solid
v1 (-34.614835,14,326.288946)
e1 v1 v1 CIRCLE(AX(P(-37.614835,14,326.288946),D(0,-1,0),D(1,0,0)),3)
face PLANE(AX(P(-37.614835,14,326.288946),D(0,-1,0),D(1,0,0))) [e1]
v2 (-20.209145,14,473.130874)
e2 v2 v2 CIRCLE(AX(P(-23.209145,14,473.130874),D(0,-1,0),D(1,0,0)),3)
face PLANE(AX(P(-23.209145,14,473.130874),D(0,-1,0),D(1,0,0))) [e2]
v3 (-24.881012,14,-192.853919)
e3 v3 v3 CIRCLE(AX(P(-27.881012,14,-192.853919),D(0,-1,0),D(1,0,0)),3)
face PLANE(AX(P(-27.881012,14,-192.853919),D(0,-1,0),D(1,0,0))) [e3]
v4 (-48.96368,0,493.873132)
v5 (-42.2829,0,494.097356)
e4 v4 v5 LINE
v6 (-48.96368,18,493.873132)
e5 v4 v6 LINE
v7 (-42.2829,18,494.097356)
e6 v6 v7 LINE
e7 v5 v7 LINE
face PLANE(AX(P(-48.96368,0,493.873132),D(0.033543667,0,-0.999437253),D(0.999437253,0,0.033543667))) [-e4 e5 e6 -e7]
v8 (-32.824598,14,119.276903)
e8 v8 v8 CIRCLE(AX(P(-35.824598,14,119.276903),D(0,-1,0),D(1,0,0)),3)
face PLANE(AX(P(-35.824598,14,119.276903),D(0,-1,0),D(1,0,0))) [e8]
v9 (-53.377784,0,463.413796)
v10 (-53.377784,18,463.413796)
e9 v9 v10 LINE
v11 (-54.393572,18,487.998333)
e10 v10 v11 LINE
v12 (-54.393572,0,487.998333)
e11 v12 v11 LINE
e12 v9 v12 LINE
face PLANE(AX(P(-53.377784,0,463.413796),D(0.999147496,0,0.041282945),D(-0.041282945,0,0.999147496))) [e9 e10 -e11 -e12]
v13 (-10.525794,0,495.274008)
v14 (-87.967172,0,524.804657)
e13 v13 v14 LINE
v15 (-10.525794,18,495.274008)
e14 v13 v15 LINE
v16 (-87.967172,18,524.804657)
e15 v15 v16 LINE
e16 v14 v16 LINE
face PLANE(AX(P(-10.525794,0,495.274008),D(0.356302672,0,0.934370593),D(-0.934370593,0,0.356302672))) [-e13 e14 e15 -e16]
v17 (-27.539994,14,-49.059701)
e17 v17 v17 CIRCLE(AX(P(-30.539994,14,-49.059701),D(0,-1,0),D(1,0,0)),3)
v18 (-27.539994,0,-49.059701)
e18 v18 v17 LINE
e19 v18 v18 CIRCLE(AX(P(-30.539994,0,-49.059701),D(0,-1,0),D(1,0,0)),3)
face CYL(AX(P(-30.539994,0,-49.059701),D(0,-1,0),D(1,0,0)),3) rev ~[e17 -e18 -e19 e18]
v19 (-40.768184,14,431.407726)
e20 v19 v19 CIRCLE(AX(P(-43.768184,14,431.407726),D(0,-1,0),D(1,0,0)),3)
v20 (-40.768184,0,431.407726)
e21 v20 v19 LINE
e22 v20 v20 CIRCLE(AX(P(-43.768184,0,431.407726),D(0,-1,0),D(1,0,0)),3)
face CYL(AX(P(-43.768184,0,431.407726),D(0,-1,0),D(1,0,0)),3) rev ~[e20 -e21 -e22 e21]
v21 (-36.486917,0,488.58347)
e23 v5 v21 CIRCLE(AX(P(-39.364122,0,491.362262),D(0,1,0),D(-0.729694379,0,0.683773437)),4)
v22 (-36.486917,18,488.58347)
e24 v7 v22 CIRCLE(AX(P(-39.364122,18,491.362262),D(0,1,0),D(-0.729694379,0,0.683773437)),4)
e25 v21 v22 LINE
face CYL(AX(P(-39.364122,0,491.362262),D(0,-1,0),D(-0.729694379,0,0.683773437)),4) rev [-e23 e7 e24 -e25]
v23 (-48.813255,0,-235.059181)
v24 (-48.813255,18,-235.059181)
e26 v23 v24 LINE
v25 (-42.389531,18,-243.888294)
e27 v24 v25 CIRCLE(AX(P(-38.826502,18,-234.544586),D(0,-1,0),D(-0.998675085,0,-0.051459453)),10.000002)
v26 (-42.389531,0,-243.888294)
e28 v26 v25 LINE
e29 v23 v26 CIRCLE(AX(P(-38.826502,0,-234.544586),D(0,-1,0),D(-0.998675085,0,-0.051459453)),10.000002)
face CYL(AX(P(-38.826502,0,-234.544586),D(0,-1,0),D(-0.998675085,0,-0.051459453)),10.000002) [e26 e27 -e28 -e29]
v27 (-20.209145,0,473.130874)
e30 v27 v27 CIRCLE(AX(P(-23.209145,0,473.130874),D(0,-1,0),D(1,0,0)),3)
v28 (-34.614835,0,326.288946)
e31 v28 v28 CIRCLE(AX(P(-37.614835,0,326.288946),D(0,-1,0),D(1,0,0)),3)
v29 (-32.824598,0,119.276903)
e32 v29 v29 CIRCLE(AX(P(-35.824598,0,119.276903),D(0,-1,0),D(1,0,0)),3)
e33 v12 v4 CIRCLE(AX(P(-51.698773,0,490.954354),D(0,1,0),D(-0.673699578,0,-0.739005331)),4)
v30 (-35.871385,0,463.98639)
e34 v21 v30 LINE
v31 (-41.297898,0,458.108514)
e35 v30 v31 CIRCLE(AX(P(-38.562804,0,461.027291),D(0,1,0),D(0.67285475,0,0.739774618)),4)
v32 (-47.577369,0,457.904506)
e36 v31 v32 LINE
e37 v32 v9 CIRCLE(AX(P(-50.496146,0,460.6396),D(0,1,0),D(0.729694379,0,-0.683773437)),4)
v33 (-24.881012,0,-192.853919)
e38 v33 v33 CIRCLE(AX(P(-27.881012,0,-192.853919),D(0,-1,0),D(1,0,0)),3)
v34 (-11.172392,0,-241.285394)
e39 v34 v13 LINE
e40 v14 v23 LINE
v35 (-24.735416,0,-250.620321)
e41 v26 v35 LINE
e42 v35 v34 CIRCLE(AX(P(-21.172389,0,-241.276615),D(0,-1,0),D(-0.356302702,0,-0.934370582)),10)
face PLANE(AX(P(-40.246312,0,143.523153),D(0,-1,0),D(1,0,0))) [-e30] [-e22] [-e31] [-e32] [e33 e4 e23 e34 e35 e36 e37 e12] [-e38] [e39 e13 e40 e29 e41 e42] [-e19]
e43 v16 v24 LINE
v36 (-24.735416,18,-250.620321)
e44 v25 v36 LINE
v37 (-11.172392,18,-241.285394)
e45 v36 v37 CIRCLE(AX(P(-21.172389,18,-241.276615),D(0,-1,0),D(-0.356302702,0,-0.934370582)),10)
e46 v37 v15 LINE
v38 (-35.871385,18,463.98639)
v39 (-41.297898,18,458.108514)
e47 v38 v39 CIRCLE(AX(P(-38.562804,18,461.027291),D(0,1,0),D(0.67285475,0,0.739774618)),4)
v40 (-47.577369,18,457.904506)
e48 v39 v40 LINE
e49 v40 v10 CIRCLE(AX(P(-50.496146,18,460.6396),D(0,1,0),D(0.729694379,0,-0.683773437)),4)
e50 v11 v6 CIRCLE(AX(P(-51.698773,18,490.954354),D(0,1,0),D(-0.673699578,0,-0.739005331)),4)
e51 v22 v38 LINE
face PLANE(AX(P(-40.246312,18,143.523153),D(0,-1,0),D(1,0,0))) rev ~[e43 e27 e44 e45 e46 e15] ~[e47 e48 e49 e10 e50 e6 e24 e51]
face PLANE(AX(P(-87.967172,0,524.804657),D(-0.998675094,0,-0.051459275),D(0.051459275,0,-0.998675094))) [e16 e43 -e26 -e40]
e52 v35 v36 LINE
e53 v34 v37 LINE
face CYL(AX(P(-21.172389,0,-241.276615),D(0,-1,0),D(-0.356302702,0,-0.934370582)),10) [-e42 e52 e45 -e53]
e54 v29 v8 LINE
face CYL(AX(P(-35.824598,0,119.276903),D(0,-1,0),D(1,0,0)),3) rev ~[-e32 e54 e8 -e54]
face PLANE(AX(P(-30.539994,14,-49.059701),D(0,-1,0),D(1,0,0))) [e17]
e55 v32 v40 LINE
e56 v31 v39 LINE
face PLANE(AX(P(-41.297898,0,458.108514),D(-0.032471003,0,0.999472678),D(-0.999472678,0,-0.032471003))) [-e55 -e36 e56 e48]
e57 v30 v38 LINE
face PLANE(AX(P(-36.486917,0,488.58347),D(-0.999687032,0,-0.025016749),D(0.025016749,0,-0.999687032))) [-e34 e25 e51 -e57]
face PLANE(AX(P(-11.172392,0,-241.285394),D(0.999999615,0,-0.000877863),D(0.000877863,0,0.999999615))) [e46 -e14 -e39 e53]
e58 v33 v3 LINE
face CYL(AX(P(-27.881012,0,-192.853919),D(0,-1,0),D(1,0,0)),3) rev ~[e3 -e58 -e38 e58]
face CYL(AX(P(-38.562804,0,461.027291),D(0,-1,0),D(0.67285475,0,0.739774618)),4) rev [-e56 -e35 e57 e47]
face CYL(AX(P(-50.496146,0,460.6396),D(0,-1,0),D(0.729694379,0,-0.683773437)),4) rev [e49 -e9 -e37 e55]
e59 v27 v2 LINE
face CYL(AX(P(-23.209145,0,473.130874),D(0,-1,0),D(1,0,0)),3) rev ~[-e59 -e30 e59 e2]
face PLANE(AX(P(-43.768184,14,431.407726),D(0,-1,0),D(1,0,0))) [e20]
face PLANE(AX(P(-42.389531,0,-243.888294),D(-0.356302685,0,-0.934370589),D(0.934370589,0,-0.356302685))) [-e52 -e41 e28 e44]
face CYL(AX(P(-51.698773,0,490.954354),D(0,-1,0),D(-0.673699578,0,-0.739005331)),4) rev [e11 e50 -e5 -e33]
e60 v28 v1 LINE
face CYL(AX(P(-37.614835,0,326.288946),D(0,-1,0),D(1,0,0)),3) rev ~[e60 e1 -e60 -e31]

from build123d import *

# Parameters (mm, degrees)
F0_R     = 3
F1_DEPTH = 18
F2_DEPTH = 14


# Not quite as in the source:
# - ends of sketch curves that miss each other by under 0.0002 mm in the source are joined


with BuildPart() as f1:
    # F0 (on Front) → F1 (new body)
    with BuildSketch(Plane.XZ):
        with BuildLine():
            Line((-42.3895305789, -243.8882939158), (-24.7354158314, -250.6203213983))
            ThreePointArc((-24.7354158314, -250.6203213983), (-15.5028330705, -249.5140993631), (-11.1723924415, -241.2853938543))
            Line((-11.1723924415, -241.2853938543), (-10.5257942379, 495.2740080398))
            Line((-10.5257942379, 495.2740080398), (-87.9671722006, 524.8046568947))
            Line((-87.9671722006, 524.8046568947), (-48.8132548023, -235.0591811233))
            ThreePointArc((-48.8132548023, -235.0591811233), (-46.9127527413, -240.4278329279), (-42.3895305789, -243.8882939158))
        make_face()
        with Locations((-27.881012126, -192.8539189117)):
            Circle(F0_R, mode=Mode.SUBTRACT)
        with Locations((-30.5399937075, -49.059701124)):
            Circle(F0_R, mode=Mode.SUBTRACT)
        with Locations((-35.8245981399, 119.2769033151)):
            Circle(F0_R, mode=Mode.SUBTRACT)
        with Locations((-37.6148353963, 326.2889456799)):
            Circle(F0_R, mode=Mode.SUBTRACT)
        with BuildLine():
            ThreePointArc((-35.8713849562, 463.9863896495), (-35.6237850386, 458.3139596858), (-41.2978981422, 458.1085140717))
            Line((-41.2978981422, 458.1085140717), (-47.5773687005, 457.9045057833))
            ThreePointArc((-47.5773687005, 457.9045057833), (-53.2508540354, 457.7393262229), (-53.3777836629, 463.4137960782))
            Line((-53.3777836629, 463.4137960782), (-54.3935717097, 487.9983330149))
            ThreePointArc((-54.3935717097, 487.9983330149), (-54.636241933, 493.6693642066), (-48.9636796908, 493.8731318846))
            Line((-48.9636796908, 493.8731318846), (-42.2828997396, 494.0973559272))
            ThreePointArc((-42.2828997396, 494.0973559272), (-36.6071005964, 494.2603360531), (-36.4869165759, 488.5834695431))
            Line((-36.4869165759, 488.5834695431), (-35.8713849562, 463.9863896495))
        make_face(mode=Mode.SUBTRACT)
        with Locations((-43.7681841537, 431.407725542)):
            Circle(F0_R, mode=Mode.SUBTRACT)
        with Locations((-23.2091454593, 473.1308742023)):
            Circle(F0_R, mode=Mode.SUBTRACT)
        with Locations((-43.7681841537, 431.407725542)):
            Circle(F0_R)
        with Locations((-23.2091454593, 473.1308742023)):
            Circle(F0_R)
        with Locations((-37.6148353963, 326.2889456799)):
            Circle(F0_R)
        with Locations((-35.8245981399, 119.2769033151)):
            Circle(F0_R)
        with Locations((-27.881012126, -192.8539189117)):
            Circle(F0_R)
        with Locations((-30.5399937075, -49.059701124)):
            Circle(F0_R)
    extrude(amount=-F1_DEPTH)

    # F0 (on Front) → F2 (cut)
    with BuildSketch(Plane.XZ):
        with Locations((-43.7681841537, 431.407725542)):
            Circle(F0_R)
        with Locations((-23.2091454593, 473.1308742023)):
            Circle(F0_R)
        with Locations((-37.6148353963, 326.2889456799)):
            Circle(F0_R)
        with Locations((-35.8245981399, 119.2769033151)):
            Circle(F0_R)
        with Locations((-27.881012126, -192.8539189117)):
            Circle(F0_R)
        with Locations((-30.5399937075, -49.059701124)):
            Circle(F0_R)
    extrude(amount=-F2_DEPTH, mode=Mode.SUBTRACT)


solid = f1.part
